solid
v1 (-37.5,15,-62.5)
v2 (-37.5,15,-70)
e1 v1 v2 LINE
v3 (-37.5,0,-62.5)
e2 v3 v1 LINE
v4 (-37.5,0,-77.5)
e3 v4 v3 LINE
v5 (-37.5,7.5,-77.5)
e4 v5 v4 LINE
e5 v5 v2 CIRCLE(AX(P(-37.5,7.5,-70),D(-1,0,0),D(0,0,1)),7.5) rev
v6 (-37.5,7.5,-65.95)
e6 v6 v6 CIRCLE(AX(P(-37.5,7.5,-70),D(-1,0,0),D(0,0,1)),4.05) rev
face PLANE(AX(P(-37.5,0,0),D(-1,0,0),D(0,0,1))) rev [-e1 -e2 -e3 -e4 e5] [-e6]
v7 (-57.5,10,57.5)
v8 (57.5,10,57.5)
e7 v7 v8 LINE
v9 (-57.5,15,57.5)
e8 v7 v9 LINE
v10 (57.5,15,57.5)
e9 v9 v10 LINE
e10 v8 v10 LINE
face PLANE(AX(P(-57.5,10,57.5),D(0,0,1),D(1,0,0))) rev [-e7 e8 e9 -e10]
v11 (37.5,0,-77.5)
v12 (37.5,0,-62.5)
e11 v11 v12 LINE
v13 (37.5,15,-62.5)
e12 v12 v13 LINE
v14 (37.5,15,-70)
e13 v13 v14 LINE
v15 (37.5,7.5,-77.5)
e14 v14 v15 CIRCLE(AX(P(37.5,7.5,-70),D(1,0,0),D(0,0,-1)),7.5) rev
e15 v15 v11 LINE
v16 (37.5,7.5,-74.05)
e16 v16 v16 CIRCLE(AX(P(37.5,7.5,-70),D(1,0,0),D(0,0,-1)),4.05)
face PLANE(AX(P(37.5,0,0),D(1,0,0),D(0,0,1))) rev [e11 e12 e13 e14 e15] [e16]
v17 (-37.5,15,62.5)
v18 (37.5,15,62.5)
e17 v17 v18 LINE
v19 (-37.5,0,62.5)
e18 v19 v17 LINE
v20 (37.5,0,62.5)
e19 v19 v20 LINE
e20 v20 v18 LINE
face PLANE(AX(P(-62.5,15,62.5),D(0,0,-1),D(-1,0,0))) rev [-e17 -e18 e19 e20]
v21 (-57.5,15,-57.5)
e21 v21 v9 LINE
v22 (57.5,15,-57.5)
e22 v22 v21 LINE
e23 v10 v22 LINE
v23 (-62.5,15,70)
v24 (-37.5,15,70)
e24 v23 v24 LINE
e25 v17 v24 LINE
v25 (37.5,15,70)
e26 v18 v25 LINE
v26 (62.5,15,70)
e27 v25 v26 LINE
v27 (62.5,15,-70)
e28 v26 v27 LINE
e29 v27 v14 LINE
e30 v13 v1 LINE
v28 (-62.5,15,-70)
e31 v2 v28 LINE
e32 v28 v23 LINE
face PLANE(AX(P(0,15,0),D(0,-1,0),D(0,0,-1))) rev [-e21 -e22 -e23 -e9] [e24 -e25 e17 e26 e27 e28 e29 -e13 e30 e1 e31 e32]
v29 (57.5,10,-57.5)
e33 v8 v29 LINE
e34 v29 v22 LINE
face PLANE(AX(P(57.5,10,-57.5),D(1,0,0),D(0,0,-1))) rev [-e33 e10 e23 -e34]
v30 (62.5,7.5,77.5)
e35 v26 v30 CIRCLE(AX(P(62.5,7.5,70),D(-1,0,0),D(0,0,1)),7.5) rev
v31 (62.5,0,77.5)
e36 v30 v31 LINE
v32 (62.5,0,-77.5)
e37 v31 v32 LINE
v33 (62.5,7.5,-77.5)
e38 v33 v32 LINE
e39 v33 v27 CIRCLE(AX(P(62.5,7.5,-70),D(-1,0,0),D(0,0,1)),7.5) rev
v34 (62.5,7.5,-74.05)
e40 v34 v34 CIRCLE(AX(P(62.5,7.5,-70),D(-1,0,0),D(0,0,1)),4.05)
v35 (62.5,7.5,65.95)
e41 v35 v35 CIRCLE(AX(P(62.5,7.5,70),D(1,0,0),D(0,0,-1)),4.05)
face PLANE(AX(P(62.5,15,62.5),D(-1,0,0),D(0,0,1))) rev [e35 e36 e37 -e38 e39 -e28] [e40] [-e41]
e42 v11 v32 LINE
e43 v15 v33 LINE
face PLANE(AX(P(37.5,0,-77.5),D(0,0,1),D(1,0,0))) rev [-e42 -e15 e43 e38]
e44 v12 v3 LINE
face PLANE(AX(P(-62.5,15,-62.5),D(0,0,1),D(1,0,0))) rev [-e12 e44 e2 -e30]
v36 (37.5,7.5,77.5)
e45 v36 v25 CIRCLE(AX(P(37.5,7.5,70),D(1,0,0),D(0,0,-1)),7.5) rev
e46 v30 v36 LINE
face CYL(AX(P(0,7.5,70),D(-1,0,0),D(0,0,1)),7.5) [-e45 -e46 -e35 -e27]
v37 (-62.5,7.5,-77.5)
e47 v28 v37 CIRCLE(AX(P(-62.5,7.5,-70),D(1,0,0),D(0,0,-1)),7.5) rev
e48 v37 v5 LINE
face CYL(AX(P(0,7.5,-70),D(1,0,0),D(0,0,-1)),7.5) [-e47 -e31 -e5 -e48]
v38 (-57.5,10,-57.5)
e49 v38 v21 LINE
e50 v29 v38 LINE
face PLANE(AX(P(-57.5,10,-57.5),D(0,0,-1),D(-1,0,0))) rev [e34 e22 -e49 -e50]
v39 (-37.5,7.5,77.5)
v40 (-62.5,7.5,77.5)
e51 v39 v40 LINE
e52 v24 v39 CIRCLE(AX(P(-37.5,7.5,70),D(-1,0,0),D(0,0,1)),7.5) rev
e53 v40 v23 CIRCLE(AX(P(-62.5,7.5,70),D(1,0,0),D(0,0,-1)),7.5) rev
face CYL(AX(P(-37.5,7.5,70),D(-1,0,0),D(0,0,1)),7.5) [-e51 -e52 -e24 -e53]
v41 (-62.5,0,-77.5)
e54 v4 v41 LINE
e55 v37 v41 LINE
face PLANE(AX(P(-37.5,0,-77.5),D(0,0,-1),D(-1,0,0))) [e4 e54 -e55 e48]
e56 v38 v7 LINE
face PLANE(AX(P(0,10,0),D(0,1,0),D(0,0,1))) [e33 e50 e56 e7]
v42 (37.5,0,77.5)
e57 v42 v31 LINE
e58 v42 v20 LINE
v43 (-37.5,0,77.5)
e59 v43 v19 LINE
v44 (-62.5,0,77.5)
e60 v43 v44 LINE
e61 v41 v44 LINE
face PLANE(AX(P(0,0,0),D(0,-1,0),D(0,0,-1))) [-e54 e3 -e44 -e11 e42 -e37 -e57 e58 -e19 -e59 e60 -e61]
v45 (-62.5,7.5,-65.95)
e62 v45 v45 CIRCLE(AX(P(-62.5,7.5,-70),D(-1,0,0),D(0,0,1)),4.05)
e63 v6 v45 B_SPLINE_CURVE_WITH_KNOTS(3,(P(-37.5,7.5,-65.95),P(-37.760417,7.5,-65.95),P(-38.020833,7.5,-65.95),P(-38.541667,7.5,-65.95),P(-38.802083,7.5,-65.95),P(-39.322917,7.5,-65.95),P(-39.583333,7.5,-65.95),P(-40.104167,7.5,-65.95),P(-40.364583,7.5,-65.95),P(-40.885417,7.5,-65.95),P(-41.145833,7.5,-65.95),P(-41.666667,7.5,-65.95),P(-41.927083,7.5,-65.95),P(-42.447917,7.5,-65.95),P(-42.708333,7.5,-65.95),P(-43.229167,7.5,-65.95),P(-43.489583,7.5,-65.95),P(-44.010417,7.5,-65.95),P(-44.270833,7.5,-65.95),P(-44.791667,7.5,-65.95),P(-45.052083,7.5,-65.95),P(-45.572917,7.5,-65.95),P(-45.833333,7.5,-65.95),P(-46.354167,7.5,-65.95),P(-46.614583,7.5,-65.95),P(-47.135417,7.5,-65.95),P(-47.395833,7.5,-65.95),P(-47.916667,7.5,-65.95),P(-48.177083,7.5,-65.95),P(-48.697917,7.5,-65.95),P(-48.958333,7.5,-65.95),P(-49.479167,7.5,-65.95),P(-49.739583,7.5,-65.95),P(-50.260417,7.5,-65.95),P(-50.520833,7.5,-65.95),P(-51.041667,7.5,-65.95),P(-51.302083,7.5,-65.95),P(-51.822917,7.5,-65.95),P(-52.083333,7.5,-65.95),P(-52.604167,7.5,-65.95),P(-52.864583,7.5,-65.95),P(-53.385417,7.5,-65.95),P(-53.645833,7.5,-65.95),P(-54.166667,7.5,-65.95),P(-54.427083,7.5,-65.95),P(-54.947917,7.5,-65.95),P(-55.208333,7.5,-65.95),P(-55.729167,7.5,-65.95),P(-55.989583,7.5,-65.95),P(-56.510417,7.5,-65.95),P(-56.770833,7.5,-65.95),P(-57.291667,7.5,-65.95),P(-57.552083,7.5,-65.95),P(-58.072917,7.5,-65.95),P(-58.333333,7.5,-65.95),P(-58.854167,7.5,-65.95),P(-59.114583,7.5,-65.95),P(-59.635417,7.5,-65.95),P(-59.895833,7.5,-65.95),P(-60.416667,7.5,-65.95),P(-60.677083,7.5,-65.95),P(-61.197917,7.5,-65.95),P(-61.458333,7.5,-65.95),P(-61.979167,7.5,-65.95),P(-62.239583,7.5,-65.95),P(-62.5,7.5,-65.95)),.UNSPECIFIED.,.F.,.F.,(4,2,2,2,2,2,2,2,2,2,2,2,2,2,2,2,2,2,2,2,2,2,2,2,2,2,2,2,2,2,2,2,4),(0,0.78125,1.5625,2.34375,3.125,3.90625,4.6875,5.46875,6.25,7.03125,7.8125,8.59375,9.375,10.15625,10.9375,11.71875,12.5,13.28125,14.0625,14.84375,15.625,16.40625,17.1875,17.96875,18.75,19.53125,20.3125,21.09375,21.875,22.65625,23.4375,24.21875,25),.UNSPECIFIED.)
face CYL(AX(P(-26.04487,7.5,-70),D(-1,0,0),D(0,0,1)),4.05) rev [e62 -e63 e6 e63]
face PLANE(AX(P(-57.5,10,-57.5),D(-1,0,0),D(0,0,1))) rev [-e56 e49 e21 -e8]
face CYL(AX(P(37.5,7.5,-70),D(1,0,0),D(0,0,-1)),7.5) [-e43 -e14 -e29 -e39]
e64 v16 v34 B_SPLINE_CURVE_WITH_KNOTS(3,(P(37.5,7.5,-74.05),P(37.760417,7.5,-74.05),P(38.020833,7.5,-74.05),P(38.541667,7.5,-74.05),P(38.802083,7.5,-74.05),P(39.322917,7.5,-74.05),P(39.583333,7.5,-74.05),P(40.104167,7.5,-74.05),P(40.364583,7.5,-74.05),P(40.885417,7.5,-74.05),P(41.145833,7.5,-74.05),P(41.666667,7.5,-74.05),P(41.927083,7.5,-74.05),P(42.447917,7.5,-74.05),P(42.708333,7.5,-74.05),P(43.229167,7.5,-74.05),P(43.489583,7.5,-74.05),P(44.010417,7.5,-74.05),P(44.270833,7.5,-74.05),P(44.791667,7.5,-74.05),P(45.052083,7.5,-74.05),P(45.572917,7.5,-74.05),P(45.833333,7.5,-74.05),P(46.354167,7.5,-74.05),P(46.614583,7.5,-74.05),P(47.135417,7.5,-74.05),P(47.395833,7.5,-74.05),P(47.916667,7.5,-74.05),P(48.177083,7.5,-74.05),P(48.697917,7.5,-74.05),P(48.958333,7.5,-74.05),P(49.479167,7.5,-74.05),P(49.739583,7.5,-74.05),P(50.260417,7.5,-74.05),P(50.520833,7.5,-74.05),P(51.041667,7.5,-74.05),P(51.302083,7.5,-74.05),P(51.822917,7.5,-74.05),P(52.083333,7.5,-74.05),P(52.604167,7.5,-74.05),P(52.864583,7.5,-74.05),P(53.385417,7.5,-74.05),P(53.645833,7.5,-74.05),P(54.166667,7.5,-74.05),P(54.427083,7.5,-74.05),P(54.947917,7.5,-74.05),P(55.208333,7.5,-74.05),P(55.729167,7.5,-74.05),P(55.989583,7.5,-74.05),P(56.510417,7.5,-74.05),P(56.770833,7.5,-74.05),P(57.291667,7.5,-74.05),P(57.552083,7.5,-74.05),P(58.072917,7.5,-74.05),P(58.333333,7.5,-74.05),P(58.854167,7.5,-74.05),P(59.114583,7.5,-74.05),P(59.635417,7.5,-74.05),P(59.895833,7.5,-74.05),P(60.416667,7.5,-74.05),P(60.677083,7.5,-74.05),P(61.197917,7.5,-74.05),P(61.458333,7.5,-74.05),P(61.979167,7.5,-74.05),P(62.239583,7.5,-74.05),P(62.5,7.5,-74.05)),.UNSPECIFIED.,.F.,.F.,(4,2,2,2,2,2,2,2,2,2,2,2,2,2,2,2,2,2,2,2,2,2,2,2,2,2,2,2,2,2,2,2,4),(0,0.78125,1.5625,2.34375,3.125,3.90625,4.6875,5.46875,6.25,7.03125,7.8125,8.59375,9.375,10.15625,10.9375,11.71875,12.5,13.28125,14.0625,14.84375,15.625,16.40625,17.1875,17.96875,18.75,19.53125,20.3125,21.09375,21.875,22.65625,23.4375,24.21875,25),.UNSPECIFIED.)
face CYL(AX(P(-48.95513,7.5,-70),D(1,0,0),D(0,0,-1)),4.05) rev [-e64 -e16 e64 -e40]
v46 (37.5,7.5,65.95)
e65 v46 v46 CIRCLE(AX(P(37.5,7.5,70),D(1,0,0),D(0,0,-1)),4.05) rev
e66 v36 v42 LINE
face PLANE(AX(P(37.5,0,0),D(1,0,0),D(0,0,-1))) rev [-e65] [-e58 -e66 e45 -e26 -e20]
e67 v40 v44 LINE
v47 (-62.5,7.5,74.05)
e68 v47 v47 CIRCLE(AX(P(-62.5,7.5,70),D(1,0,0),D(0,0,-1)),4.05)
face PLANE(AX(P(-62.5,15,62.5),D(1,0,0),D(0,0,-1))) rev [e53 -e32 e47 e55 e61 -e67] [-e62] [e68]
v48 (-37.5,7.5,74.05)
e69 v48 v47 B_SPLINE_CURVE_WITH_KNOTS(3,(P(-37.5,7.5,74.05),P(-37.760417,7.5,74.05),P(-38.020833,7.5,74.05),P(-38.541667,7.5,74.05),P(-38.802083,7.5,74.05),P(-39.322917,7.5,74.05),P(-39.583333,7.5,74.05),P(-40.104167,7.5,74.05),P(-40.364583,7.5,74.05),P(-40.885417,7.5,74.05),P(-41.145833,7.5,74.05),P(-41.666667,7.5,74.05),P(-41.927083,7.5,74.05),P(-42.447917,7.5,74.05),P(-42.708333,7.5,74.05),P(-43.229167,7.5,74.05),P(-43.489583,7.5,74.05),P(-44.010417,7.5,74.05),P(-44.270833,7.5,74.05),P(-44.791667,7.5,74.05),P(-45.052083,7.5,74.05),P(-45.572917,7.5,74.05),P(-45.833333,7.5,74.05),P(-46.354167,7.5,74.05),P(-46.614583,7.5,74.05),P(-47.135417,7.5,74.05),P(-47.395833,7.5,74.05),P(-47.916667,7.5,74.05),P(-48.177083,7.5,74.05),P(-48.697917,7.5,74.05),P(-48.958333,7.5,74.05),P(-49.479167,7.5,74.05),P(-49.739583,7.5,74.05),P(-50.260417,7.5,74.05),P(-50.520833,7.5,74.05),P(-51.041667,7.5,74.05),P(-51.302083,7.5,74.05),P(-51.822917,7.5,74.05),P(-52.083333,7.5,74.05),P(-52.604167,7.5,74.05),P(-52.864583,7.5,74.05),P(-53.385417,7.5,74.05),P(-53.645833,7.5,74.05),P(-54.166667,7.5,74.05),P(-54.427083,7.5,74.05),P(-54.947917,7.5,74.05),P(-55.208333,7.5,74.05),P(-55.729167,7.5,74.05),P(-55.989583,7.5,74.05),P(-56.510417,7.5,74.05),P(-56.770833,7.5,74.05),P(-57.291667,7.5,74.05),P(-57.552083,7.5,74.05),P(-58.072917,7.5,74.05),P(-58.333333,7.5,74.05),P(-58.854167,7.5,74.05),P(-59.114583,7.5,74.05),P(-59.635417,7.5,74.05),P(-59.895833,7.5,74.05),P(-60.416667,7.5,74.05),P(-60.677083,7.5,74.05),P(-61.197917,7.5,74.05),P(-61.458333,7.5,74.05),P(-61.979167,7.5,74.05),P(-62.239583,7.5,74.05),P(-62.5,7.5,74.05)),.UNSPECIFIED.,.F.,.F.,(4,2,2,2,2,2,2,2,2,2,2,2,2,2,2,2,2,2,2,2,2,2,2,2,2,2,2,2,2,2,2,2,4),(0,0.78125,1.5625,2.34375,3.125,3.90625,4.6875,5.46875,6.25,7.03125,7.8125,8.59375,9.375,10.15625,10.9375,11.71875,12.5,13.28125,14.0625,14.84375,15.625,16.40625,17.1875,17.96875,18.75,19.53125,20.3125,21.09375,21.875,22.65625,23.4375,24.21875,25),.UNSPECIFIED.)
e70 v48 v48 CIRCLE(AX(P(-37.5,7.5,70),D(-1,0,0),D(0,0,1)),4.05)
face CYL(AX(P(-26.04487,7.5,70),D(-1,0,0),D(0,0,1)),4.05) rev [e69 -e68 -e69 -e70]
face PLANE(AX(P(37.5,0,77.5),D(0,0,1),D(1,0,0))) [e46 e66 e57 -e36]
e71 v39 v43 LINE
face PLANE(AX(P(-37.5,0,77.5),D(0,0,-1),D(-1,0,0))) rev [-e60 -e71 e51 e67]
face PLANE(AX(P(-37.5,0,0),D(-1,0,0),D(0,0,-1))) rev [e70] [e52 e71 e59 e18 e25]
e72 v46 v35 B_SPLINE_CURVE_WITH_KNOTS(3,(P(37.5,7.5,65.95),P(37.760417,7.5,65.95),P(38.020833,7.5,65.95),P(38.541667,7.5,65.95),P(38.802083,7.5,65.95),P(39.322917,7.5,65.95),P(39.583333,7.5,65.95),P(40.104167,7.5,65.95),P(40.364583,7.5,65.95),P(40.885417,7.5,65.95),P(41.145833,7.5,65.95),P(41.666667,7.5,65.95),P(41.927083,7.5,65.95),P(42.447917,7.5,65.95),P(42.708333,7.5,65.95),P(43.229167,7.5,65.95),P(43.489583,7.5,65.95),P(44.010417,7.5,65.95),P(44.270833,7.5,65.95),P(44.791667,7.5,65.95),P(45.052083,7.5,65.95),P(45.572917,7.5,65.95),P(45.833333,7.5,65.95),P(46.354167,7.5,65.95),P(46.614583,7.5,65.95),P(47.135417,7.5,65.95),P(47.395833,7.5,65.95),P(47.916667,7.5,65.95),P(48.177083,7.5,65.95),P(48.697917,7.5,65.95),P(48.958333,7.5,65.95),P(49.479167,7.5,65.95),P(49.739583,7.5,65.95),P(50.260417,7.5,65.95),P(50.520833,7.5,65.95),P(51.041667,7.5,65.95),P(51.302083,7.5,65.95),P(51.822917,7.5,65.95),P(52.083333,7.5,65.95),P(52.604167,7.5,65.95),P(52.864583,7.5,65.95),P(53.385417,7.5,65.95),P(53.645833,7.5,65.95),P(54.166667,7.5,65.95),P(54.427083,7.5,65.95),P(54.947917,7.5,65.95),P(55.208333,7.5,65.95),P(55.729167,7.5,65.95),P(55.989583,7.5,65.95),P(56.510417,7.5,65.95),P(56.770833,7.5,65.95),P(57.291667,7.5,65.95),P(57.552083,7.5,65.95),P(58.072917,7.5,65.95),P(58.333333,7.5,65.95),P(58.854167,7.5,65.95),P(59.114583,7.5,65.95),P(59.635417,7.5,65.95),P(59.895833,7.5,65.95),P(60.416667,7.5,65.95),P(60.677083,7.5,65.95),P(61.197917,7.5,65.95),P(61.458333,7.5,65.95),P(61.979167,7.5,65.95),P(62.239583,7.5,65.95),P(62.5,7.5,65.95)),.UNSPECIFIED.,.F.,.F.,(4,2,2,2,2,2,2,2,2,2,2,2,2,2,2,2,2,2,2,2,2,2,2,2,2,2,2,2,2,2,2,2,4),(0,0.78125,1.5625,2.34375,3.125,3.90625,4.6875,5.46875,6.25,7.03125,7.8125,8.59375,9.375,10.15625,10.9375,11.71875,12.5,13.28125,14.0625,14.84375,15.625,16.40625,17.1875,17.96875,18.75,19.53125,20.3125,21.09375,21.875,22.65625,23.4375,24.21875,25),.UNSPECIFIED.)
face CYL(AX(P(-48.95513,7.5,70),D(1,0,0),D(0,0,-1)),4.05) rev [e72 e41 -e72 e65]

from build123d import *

# Parameters (mm, degrees)
SKETCH1_W            = 125
SKETCH1_H            = 125
BOSS_EXTRUDE1_DEPTH  = 15
SKETCH2_W            = 115
SKETCH2_H            = 115
CUT_EXTRUDE1_DEPTH   = 5
SKETCH3_W            = 15
SKETCH3_H            = 15
BOSS_EXTRUDE12_DEPTH = 25
SKETCH4_R            = 4.05
CUT_EXTRUDE2_DEPTH   = 25
FILLET1_R            = 7.5
FILLET1_OF_MIRROR1_R = 7.5
MIRROR2_START        = -62.5
MIRROR2_OUTLINE_R    = 4.05
MIRROR2_DEPTH        = 25
MIRROR2_START_2      = 37.5
MIRROR2_2_OUTLINE_R  = 4.05
MIRROR2_2_DEPTH      = 25


# Read off the part's stored shape, not the designer's step: Mirror2
with BuildPart() as part:
    # Sketch1 → Boss-Extrude1 (new body)
    with BuildSketch(Plane(origin=(0, 0, 0), x_dir=(1, 0, 0), z_dir=(0, 1, 0))):
        Rectangle(SKETCH1_W, SKETCH1_H)
    extrude(amount=BOSS_EXTRUDE1_DEPTH)

    # Sketch2 → Cut-Extrude1 (cut)
    with BuildSketch(Plane(origin=(0, 15, 0), x_dir=(1, 0, 0), z_dir=(0, 1, 0))):
        Rectangle(SKETCH2_W, SKETCH2_H)
    extrude(amount=-CUT_EXTRUDE1_DEPTH, mode=Mode.SUBTRACT)

    # Sketch3 → Boss-Extrude12 (add)
    with BuildSketch(Plane.ZY.offset(62.5)):
        with Locations((-70, 7.5)):
            Rectangle(SKETCH3_W, SKETCH3_H)
    boss_extrude12 = extrude(amount=-BOSS_EXTRUDE12_DEPTH)

    # Sketch4 → Cut-Extrude2 (cut)
    with BuildSketch(Plane.ZY.offset(62.5)):
        with Locations((-70, 7.5)):
            Circle(SKETCH4_R)
    cut_extrude2 = extrude(amount=-CUT_EXTRUDE2_DEPTH, mode=Mode.SUBTRACT)

    # Fillet1
    fillet1_edges = [part.edges().sort_by_distance(p)[0] for p in [
        (-50, 15, -77.5),
    ]]
    fillet(fillet1_edges, radius=FILLET1_R)

    # Mirror1: Boss-Extrude12, Cut-Extrude2 across plane
    add(boss_extrude12.mirror(Plane(origin=(0, 0, 0), x_dir=(0, 0, 1), z_dir=(1, 0, 0))))
    add(cut_extrude2.mirror(Plane(origin=(0, 0, 0), x_dir=(0, 0, 1), z_dir=(1, 0, 0))), mode=Mode.SUBTRACT)

    # Fillet1 of Mirror1
    fillet1_of_mirror1_edges = [part.edges().sort_by_distance(p)[0] for p in [
        (50, 15, -77.5),
    ]]
    fillet(fillet1_of_mirror1_edges, radius=FILLET1_OF_MIRROR1_R)

    # Mirror2 outline → Mirror2 (add)
    with BuildSketch(Plane.YZ.offset(MIRROR2_START)):
        with BuildLine():
            Line((15, 62.5), (15, 70))
            ThreePointArc((15, 70), (12.803300859, 75.303300859), (7.5, 77.5))
            Line((7.5, 77.5), (0, 77.5))
            Line((0, 77.5), (0, 62.5))
            Line((0, 62.5), (15, 62.5))
        make_face()
        with Locations((7.5, 70)):
            Circle(MIRROR2_OUTLINE_R, mode=Mode.SUBTRACT)
    extrude(amount=MIRROR2_DEPTH)

    # Mirror2 2 outline → Mirror2 2 (add)
    with BuildSketch(Plane.YZ.offset(MIRROR2_START_2)):
        with BuildLine():
            Line((15, 62.5), (15, 70))
            ThreePointArc((15, 70), (12.803300859, 75.303300859), (7.5, 77.5))
            Line((7.5, 77.5), (0, 77.5))
            Line((0, 77.5), (0, 62.5))
            Line((0, 62.5), (15, 62.5))
        make_face()
        with Locations((7.5, 70)):
            Circle(MIRROR2_2_OUTLINE_R, mode=Mode.SUBTRACT)
    extrude(amount=MIRROR2_2_DEPTH)


solid = part.part
